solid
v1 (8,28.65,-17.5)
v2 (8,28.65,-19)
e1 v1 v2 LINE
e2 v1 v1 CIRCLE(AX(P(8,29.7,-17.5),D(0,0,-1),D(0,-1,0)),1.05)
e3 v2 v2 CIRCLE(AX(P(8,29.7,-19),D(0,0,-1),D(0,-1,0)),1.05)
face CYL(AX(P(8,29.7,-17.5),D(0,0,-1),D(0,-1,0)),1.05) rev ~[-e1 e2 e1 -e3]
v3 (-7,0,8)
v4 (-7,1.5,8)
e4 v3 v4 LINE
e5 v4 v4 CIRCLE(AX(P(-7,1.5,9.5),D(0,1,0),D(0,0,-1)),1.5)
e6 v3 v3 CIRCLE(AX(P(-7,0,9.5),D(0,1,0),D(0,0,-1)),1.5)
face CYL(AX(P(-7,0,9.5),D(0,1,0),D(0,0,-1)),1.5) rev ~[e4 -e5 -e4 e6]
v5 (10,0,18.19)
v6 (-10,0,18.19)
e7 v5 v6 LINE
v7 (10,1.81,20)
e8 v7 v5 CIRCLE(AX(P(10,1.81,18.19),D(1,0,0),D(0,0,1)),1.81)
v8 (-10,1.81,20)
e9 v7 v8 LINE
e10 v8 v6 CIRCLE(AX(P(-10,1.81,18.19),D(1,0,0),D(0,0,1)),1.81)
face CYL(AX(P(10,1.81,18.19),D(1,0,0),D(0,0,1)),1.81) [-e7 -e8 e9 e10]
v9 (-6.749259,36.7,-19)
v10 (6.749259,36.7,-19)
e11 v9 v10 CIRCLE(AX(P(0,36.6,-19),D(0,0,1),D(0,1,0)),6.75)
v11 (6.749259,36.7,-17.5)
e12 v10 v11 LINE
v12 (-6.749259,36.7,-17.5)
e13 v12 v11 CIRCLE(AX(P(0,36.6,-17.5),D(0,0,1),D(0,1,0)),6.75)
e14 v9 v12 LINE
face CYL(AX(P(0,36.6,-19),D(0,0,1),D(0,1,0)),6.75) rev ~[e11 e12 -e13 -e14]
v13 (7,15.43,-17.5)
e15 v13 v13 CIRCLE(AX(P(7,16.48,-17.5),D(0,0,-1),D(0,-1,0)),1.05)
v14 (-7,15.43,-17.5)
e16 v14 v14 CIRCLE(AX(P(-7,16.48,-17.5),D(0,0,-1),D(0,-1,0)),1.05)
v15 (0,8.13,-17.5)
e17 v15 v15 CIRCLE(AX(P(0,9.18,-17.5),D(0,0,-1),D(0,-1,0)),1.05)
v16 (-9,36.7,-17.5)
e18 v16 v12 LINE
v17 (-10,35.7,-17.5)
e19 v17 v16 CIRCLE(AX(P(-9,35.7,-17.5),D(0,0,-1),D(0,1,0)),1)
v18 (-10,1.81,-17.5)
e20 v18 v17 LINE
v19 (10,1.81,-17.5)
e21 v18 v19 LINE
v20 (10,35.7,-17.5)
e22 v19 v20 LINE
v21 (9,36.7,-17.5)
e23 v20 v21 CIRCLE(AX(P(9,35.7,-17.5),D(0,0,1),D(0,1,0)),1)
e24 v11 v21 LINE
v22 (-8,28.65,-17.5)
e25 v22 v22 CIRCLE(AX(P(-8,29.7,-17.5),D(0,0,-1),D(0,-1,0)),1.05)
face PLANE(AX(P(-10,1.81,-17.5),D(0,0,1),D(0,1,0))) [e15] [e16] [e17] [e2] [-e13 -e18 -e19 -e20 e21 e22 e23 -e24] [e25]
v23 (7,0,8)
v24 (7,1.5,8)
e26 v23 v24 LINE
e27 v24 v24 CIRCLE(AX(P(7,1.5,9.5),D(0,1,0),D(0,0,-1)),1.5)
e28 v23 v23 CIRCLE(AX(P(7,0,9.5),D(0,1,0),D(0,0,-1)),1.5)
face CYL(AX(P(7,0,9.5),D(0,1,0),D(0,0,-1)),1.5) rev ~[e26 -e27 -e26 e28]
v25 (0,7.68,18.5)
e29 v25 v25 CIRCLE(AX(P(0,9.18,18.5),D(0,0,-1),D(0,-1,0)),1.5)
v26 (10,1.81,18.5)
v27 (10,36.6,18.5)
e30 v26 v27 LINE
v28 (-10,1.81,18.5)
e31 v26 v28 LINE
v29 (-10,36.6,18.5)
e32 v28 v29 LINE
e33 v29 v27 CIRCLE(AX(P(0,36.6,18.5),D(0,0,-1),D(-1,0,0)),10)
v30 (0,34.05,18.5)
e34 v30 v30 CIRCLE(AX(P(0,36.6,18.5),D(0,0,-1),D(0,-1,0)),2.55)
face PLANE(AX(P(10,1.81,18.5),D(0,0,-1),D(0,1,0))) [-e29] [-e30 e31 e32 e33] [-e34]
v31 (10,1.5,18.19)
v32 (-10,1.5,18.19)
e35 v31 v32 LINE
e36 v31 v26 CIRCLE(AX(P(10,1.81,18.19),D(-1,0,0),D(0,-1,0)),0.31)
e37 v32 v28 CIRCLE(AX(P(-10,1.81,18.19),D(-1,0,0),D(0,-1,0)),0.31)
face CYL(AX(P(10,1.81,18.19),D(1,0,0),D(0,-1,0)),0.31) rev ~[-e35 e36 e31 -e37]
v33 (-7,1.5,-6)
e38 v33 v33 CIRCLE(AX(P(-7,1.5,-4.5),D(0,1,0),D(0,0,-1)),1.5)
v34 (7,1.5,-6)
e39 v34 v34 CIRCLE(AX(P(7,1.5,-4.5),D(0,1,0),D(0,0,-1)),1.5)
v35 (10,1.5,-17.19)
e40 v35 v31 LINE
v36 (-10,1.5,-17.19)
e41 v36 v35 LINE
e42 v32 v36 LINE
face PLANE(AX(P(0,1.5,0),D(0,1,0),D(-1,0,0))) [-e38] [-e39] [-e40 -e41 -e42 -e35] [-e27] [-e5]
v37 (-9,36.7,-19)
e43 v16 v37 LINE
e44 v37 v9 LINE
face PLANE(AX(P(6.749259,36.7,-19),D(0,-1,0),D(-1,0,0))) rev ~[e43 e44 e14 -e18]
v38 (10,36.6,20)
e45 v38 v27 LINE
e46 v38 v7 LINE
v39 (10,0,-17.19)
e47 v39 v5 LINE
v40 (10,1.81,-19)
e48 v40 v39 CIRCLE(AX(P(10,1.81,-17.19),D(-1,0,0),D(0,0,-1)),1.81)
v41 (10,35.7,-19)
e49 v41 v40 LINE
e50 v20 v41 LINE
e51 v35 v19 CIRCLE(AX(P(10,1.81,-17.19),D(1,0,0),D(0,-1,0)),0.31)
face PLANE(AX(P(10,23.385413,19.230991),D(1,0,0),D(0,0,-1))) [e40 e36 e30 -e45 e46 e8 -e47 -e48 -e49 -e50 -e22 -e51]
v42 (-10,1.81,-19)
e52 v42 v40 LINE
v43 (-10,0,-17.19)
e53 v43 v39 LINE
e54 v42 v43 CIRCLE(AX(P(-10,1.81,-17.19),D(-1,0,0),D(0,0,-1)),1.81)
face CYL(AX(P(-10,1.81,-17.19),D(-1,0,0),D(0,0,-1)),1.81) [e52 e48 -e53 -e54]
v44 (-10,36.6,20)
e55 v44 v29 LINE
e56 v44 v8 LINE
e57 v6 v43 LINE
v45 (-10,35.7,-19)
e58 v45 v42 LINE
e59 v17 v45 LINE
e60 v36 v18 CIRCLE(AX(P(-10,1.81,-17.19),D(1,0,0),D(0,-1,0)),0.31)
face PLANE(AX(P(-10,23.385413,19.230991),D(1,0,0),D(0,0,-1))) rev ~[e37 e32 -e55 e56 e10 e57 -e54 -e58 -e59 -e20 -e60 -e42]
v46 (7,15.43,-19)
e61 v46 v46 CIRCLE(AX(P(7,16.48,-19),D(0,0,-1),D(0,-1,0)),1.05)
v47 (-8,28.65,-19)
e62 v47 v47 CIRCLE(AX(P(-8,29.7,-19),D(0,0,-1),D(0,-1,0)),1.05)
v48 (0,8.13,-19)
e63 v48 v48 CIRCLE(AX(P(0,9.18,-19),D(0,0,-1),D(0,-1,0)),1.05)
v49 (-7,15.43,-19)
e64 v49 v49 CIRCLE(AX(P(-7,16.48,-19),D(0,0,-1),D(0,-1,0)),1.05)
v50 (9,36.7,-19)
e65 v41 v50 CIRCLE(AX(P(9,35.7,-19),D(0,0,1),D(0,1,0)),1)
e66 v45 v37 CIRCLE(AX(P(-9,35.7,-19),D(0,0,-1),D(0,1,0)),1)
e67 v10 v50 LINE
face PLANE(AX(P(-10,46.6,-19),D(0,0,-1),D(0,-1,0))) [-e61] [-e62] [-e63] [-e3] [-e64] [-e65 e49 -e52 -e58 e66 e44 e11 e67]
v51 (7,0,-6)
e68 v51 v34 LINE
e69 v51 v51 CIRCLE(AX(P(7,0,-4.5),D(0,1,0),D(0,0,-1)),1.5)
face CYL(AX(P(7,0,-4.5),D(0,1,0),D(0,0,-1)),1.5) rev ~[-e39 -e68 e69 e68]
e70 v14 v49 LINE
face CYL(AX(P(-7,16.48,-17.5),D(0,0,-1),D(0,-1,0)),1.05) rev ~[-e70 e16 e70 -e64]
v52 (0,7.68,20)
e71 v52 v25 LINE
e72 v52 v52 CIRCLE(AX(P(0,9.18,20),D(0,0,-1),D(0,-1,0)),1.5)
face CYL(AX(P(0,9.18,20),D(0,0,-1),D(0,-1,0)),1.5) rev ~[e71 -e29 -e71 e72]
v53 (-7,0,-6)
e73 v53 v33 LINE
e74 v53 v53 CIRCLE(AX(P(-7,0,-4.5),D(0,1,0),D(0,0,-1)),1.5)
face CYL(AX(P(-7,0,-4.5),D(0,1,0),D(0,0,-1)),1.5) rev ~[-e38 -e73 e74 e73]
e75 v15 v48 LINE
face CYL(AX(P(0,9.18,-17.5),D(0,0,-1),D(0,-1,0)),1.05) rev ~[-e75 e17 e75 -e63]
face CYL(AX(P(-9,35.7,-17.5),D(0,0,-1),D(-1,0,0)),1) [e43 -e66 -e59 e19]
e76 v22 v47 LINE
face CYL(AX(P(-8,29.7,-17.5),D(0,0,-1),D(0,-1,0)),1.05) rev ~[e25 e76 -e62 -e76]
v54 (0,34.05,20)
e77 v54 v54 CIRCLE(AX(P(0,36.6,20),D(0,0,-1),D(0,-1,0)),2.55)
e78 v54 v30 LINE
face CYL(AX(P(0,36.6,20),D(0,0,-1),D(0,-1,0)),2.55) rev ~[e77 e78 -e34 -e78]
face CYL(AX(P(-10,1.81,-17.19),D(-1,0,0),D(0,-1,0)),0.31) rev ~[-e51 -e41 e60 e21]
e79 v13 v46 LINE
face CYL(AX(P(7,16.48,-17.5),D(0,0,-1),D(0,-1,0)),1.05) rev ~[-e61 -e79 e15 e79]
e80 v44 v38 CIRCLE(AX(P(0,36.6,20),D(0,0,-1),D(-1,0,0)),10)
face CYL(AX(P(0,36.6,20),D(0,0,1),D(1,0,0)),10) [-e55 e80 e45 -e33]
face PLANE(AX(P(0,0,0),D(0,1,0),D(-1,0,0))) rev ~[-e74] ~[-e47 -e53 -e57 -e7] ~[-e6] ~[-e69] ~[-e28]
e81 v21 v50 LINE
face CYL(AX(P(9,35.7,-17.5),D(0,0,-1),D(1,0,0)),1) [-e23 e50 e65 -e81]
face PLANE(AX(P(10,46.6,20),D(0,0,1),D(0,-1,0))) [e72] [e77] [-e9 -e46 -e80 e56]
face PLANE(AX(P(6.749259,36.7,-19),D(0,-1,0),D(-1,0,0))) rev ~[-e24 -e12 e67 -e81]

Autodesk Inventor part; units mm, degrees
ref_plane "YZ Plane" through (0, 0, 0) normal (1, 0, 0) x (0, 1, 0)
ref_plane "XZ Plane" through (0, 0, 0) normal (0, 1, 0) x (-1, 0, 0)
ref_plane "XY Plane" through (0, 0, 0) normal (0, 0, 1) x (1, 0, 0)
sketch "Sketch1" plane through (0, 0, 0) normal (0, 1, 0) x (-1, 0, 0)
  line L0 (10, -17.5) -> (-10, -17.5)
  line L1 (-10, -17.5) -> (-10, 18.5)
  line L2 (-10, 18.5) -> (10, 18.5)
  line L3 (10, 18.5) -> (10, -17.5)
  point P0 (0, 0)
  dimension "d0" = 20
  dimension "d1" = 36
  dimension "d2" = 17.5
  dimension "d3" = 10
extrude "Plate1" add sketch "Sketch1" along normal blind 1.5
sketch "Sketch2" plane through (-10, 0, -19) normal (0, 0, 1) x (1, 0, 0)
  line L0 (20, 0) -> (0, 0)
  line L1 (0, 0) -> (0, 46.6)
  line L2 (0, 46.6) -> (20, 46.6)
  line L3 (20, 46.6) -> (20, 0)
edge flange "Flange1" height 46.6 angle 90 thickness 1.5 bend radius 0.31 thickness toward (0, 0, 1) relief tear relief width 1.5 relief depth 0.75 edges at (0, 1.5, -17.5) wall of the first edge with corners at (10, 0, -19) (-10, 0, -19) (-10, 46.6, -19) (10, 46.6, -19)
bend "Bend1"
corner "Corner1"
sketch "Sketch3" plane through (10, 0, 20) normal (0, 0, -1) x (-1, 0, 0)
  line L0 (20, 0) -> (0, 0)
  line L1 (0, 0) -> (0, 46.6)
  line L2 (0, 46.6) -> (20, 46.6)
  line L3 (20, 46.6) -> (20, 0)
edge flange "Flange2" height 46.6 angle 90 thickness 1.5 bend radius 0.31 thickness toward (0, 0, -1) relief tear relief width 1.5 relief depth 0.75 edges at (0, 1.5, 18.5) wall of the first edge with corners at (-10, 0, 20) (10, 0, 20) (10, 46.6, 20) (-10, 46.6, 20)
bend "Bend2"
corner "Corner2"
sketch "Sketch4" plane through (-10, 46.6, 20) normal (0, 0, 1) x (1, 0, 0)
  circle A0 centre (10, -10) radius 10
  line L0 (0, 0) -> (20, 0) projected
  line L1 (0, 0) -> (20, 0)
  line L2 (20, 0) -> (20, -10)
  line L3 (20, -10) -> (0, -10)
  line L4 (0, -10) -> (0, 0)
  line L5 (0, -44.79) -> (0, 0) projected
  point P0 (10, -46.6)
  point P1 (10, -10)
  point P2 (20, 0)
  point P3 (10, 0)
  point P4 (0, -10)
  point P5 (8.5893, 0)
  point P6 (0, -10)
  dimension "d26" = 20
  dimension "d25" = 10
  dimension "d27" = 10
  dimension "d28" = 10
extrude "Extrusion1" cut sketch "Sketch4" against normal blind 10 contours L4 L0 A0 | A0 L0 L2
sketch "Sketch5" plane through (10, 46.6, -19) normal (0, 0, -1) x (-1, 0, 0)
  arc A0 (20, -10) -> (0, -10) centre (10, -10) ccw projected
  point P0 (10, -46.6)
hole "Hole1" at (0, 36.6, -19) direction (0, 0, 1) diameter 13.5 depth 1.5
sketch "Sketch6" plane through (10, 46.6, -19) normal (0, 0, -1) x (-1, 0, 0)
  circle A0 centre (10, -10) radius 6.75 projected
  line L0 (0, 0) -> (20, 0) projected
  line L1 (0, -44.79) -> (0, 0) projected
  line L2 (24, 0) -> (-4, 0)
  line L3 (-4, 0) -> (-4, -9.9)
  line L4 (-4, -9.9) -> (24, -9.9)
  line L5 (24, -9.9) -> (24, 0)
  point P0 (10, -46.6)
  point P1 (20, 0)
  point P2 (6.005, 0)
  point P3 (13.995, 0)
  dimension "d38" = 9.9
  dimension "d39" = 4
  dimension "d40" = 28
extrude "Extrusion2" cut sketch "Sketch6" against normal blind 10 contours L4 A0 | A0 L4 L1 L0 L2 L5 | L4 L3 L2 L1 picked at (7.8223, -9.3675)
fillet "Fillet1" radius 1 2 edges at (-10, 36.7, -18.25) (10, 36.7, -18.25)
sketch "Sketch7" plane through (-10, 1.81, 20) normal (0, 0, 1) x (1, 0, 0)
  arc A0 (20, 34.79) -> (0, 34.79) centre (10, 34.79) ccw projected
  point P0 (10, -1.81)
hole "Hole2" at (0, 36.6, 20) direction (0, 0, -1) diameter 5.1 depth 1.5 clearance for "Hex Head Bolt" size "M5" standard "Ansi Metric M Profile"
sketch "Sketch8" plane through (0, 0, 0) normal (0, -1, 0) x (1, 0, 0)
  line L0 (2.55, 18.5) -> (-2.55, 18.5) projected
  line L1 (-10, 18.5) -> (10, 18.5) projected
  line L2 (10, 18.5) -> (-10, 18.5) projected
  line L3 (10, 18.19) -> (-10, 18.19) projected
  line L4 (-10, -17.19) -> (-10, 18.19) projected
  line L5 (-10, -17.19) -> (10, -17.19) projected
  line L6 (10, 18.19) -> (10, -17.19) projected
  point P0 (0, 0)
  point P1 (7, 9.5)
  point P2 (7, -4.5)
  point P3 (-7, 9.5)
  point P4 (-7, -4.5)
  dimension "d51" = 9
  dimension "d52" = 3
  dimension "d55" = 14
  dimension "d58" = 14
hole "Hole3" at (7, 0, 9.5) at (7, 0, -4.5) at (-7, 0, 9.5) at (-7, 0, -4.5) direction (0, 1, 0) diameter 3 depth 1.5
hole "Hole5" at (-8, 29.7, -17.5) at (8, 29.7, -17.5) at (7, 16.48, -17.5) at (-7, 16.48, -17.5) at (0, 9.18, -17.5) direction (0, 0, -1) diameter 2.1 depth 1.5
sketch "Sketch11" plane through (-10, 1.81, 20) normal (0, 0, 1) x (1, 0, 0)
  circle A0 centre (10, 7.37) radius 1.1
  point P0 (10, -1.81)
hole "Hole6" at (0, 9.18, 20) direction (0, 0, -1) diameter 3 depth 1.5
equation "\"d66\" = Thickness"
equation "\"d80\" = Thickness"
equation "\"d49\" = Thickness"
equation "\"d4\" = Thickness"
equation "\"d15\" = BendReliefWidth"
equation "\"d16\" = BendReliefDepth"
equation "\"d17\" = MinimumRemnant"
equation "\"d18\" = TransitionRadius"
equation "\"d21\" = BendRadius"
equation "\"d22\" = CornerReliefSize"
equation "\"d23\" = GapSize"
equation "\"d24\" = JacobiRadiusSize"
equation "\"d36\" = Thickness"
equation "\"d5\" = BendReliefWidth"
equation "\"d6\" = BendReliefDepth"
equation "\"d7\" = MinimumRemnant"
equation "\"d8\" = TransitionRadius"
equation "\"d11\" = BendRadius"
equation "\"d12\" = CornerReliefSize"
equation "\"d13\" = GapSize"
equation "\"d14\" = JacobiRadiusSize"
equation "\"d87\" = Thickness"
equation "\"BendReliefWidth\" = Thickness"
equation "\"BendReliefDepth\" = 0.5 * Thickness"
equation "\"CornerReliefSize\" = 4 * Thickness"
equation "\"MinimumRemnant\" = 2 * Thickness"
equation "\"TransitionRadius\" = BendRadius"
equation "\"JacobiRadiusSize\" = BendRadius"
equation "\"GapSize\" = Thickness"
equation "\"Thickness\" = 1.5"
equation "\"BendRadius\" = 0.31"
properties part number "axis_9_bottom_frame" material "Aluminum 6061-AHC"
